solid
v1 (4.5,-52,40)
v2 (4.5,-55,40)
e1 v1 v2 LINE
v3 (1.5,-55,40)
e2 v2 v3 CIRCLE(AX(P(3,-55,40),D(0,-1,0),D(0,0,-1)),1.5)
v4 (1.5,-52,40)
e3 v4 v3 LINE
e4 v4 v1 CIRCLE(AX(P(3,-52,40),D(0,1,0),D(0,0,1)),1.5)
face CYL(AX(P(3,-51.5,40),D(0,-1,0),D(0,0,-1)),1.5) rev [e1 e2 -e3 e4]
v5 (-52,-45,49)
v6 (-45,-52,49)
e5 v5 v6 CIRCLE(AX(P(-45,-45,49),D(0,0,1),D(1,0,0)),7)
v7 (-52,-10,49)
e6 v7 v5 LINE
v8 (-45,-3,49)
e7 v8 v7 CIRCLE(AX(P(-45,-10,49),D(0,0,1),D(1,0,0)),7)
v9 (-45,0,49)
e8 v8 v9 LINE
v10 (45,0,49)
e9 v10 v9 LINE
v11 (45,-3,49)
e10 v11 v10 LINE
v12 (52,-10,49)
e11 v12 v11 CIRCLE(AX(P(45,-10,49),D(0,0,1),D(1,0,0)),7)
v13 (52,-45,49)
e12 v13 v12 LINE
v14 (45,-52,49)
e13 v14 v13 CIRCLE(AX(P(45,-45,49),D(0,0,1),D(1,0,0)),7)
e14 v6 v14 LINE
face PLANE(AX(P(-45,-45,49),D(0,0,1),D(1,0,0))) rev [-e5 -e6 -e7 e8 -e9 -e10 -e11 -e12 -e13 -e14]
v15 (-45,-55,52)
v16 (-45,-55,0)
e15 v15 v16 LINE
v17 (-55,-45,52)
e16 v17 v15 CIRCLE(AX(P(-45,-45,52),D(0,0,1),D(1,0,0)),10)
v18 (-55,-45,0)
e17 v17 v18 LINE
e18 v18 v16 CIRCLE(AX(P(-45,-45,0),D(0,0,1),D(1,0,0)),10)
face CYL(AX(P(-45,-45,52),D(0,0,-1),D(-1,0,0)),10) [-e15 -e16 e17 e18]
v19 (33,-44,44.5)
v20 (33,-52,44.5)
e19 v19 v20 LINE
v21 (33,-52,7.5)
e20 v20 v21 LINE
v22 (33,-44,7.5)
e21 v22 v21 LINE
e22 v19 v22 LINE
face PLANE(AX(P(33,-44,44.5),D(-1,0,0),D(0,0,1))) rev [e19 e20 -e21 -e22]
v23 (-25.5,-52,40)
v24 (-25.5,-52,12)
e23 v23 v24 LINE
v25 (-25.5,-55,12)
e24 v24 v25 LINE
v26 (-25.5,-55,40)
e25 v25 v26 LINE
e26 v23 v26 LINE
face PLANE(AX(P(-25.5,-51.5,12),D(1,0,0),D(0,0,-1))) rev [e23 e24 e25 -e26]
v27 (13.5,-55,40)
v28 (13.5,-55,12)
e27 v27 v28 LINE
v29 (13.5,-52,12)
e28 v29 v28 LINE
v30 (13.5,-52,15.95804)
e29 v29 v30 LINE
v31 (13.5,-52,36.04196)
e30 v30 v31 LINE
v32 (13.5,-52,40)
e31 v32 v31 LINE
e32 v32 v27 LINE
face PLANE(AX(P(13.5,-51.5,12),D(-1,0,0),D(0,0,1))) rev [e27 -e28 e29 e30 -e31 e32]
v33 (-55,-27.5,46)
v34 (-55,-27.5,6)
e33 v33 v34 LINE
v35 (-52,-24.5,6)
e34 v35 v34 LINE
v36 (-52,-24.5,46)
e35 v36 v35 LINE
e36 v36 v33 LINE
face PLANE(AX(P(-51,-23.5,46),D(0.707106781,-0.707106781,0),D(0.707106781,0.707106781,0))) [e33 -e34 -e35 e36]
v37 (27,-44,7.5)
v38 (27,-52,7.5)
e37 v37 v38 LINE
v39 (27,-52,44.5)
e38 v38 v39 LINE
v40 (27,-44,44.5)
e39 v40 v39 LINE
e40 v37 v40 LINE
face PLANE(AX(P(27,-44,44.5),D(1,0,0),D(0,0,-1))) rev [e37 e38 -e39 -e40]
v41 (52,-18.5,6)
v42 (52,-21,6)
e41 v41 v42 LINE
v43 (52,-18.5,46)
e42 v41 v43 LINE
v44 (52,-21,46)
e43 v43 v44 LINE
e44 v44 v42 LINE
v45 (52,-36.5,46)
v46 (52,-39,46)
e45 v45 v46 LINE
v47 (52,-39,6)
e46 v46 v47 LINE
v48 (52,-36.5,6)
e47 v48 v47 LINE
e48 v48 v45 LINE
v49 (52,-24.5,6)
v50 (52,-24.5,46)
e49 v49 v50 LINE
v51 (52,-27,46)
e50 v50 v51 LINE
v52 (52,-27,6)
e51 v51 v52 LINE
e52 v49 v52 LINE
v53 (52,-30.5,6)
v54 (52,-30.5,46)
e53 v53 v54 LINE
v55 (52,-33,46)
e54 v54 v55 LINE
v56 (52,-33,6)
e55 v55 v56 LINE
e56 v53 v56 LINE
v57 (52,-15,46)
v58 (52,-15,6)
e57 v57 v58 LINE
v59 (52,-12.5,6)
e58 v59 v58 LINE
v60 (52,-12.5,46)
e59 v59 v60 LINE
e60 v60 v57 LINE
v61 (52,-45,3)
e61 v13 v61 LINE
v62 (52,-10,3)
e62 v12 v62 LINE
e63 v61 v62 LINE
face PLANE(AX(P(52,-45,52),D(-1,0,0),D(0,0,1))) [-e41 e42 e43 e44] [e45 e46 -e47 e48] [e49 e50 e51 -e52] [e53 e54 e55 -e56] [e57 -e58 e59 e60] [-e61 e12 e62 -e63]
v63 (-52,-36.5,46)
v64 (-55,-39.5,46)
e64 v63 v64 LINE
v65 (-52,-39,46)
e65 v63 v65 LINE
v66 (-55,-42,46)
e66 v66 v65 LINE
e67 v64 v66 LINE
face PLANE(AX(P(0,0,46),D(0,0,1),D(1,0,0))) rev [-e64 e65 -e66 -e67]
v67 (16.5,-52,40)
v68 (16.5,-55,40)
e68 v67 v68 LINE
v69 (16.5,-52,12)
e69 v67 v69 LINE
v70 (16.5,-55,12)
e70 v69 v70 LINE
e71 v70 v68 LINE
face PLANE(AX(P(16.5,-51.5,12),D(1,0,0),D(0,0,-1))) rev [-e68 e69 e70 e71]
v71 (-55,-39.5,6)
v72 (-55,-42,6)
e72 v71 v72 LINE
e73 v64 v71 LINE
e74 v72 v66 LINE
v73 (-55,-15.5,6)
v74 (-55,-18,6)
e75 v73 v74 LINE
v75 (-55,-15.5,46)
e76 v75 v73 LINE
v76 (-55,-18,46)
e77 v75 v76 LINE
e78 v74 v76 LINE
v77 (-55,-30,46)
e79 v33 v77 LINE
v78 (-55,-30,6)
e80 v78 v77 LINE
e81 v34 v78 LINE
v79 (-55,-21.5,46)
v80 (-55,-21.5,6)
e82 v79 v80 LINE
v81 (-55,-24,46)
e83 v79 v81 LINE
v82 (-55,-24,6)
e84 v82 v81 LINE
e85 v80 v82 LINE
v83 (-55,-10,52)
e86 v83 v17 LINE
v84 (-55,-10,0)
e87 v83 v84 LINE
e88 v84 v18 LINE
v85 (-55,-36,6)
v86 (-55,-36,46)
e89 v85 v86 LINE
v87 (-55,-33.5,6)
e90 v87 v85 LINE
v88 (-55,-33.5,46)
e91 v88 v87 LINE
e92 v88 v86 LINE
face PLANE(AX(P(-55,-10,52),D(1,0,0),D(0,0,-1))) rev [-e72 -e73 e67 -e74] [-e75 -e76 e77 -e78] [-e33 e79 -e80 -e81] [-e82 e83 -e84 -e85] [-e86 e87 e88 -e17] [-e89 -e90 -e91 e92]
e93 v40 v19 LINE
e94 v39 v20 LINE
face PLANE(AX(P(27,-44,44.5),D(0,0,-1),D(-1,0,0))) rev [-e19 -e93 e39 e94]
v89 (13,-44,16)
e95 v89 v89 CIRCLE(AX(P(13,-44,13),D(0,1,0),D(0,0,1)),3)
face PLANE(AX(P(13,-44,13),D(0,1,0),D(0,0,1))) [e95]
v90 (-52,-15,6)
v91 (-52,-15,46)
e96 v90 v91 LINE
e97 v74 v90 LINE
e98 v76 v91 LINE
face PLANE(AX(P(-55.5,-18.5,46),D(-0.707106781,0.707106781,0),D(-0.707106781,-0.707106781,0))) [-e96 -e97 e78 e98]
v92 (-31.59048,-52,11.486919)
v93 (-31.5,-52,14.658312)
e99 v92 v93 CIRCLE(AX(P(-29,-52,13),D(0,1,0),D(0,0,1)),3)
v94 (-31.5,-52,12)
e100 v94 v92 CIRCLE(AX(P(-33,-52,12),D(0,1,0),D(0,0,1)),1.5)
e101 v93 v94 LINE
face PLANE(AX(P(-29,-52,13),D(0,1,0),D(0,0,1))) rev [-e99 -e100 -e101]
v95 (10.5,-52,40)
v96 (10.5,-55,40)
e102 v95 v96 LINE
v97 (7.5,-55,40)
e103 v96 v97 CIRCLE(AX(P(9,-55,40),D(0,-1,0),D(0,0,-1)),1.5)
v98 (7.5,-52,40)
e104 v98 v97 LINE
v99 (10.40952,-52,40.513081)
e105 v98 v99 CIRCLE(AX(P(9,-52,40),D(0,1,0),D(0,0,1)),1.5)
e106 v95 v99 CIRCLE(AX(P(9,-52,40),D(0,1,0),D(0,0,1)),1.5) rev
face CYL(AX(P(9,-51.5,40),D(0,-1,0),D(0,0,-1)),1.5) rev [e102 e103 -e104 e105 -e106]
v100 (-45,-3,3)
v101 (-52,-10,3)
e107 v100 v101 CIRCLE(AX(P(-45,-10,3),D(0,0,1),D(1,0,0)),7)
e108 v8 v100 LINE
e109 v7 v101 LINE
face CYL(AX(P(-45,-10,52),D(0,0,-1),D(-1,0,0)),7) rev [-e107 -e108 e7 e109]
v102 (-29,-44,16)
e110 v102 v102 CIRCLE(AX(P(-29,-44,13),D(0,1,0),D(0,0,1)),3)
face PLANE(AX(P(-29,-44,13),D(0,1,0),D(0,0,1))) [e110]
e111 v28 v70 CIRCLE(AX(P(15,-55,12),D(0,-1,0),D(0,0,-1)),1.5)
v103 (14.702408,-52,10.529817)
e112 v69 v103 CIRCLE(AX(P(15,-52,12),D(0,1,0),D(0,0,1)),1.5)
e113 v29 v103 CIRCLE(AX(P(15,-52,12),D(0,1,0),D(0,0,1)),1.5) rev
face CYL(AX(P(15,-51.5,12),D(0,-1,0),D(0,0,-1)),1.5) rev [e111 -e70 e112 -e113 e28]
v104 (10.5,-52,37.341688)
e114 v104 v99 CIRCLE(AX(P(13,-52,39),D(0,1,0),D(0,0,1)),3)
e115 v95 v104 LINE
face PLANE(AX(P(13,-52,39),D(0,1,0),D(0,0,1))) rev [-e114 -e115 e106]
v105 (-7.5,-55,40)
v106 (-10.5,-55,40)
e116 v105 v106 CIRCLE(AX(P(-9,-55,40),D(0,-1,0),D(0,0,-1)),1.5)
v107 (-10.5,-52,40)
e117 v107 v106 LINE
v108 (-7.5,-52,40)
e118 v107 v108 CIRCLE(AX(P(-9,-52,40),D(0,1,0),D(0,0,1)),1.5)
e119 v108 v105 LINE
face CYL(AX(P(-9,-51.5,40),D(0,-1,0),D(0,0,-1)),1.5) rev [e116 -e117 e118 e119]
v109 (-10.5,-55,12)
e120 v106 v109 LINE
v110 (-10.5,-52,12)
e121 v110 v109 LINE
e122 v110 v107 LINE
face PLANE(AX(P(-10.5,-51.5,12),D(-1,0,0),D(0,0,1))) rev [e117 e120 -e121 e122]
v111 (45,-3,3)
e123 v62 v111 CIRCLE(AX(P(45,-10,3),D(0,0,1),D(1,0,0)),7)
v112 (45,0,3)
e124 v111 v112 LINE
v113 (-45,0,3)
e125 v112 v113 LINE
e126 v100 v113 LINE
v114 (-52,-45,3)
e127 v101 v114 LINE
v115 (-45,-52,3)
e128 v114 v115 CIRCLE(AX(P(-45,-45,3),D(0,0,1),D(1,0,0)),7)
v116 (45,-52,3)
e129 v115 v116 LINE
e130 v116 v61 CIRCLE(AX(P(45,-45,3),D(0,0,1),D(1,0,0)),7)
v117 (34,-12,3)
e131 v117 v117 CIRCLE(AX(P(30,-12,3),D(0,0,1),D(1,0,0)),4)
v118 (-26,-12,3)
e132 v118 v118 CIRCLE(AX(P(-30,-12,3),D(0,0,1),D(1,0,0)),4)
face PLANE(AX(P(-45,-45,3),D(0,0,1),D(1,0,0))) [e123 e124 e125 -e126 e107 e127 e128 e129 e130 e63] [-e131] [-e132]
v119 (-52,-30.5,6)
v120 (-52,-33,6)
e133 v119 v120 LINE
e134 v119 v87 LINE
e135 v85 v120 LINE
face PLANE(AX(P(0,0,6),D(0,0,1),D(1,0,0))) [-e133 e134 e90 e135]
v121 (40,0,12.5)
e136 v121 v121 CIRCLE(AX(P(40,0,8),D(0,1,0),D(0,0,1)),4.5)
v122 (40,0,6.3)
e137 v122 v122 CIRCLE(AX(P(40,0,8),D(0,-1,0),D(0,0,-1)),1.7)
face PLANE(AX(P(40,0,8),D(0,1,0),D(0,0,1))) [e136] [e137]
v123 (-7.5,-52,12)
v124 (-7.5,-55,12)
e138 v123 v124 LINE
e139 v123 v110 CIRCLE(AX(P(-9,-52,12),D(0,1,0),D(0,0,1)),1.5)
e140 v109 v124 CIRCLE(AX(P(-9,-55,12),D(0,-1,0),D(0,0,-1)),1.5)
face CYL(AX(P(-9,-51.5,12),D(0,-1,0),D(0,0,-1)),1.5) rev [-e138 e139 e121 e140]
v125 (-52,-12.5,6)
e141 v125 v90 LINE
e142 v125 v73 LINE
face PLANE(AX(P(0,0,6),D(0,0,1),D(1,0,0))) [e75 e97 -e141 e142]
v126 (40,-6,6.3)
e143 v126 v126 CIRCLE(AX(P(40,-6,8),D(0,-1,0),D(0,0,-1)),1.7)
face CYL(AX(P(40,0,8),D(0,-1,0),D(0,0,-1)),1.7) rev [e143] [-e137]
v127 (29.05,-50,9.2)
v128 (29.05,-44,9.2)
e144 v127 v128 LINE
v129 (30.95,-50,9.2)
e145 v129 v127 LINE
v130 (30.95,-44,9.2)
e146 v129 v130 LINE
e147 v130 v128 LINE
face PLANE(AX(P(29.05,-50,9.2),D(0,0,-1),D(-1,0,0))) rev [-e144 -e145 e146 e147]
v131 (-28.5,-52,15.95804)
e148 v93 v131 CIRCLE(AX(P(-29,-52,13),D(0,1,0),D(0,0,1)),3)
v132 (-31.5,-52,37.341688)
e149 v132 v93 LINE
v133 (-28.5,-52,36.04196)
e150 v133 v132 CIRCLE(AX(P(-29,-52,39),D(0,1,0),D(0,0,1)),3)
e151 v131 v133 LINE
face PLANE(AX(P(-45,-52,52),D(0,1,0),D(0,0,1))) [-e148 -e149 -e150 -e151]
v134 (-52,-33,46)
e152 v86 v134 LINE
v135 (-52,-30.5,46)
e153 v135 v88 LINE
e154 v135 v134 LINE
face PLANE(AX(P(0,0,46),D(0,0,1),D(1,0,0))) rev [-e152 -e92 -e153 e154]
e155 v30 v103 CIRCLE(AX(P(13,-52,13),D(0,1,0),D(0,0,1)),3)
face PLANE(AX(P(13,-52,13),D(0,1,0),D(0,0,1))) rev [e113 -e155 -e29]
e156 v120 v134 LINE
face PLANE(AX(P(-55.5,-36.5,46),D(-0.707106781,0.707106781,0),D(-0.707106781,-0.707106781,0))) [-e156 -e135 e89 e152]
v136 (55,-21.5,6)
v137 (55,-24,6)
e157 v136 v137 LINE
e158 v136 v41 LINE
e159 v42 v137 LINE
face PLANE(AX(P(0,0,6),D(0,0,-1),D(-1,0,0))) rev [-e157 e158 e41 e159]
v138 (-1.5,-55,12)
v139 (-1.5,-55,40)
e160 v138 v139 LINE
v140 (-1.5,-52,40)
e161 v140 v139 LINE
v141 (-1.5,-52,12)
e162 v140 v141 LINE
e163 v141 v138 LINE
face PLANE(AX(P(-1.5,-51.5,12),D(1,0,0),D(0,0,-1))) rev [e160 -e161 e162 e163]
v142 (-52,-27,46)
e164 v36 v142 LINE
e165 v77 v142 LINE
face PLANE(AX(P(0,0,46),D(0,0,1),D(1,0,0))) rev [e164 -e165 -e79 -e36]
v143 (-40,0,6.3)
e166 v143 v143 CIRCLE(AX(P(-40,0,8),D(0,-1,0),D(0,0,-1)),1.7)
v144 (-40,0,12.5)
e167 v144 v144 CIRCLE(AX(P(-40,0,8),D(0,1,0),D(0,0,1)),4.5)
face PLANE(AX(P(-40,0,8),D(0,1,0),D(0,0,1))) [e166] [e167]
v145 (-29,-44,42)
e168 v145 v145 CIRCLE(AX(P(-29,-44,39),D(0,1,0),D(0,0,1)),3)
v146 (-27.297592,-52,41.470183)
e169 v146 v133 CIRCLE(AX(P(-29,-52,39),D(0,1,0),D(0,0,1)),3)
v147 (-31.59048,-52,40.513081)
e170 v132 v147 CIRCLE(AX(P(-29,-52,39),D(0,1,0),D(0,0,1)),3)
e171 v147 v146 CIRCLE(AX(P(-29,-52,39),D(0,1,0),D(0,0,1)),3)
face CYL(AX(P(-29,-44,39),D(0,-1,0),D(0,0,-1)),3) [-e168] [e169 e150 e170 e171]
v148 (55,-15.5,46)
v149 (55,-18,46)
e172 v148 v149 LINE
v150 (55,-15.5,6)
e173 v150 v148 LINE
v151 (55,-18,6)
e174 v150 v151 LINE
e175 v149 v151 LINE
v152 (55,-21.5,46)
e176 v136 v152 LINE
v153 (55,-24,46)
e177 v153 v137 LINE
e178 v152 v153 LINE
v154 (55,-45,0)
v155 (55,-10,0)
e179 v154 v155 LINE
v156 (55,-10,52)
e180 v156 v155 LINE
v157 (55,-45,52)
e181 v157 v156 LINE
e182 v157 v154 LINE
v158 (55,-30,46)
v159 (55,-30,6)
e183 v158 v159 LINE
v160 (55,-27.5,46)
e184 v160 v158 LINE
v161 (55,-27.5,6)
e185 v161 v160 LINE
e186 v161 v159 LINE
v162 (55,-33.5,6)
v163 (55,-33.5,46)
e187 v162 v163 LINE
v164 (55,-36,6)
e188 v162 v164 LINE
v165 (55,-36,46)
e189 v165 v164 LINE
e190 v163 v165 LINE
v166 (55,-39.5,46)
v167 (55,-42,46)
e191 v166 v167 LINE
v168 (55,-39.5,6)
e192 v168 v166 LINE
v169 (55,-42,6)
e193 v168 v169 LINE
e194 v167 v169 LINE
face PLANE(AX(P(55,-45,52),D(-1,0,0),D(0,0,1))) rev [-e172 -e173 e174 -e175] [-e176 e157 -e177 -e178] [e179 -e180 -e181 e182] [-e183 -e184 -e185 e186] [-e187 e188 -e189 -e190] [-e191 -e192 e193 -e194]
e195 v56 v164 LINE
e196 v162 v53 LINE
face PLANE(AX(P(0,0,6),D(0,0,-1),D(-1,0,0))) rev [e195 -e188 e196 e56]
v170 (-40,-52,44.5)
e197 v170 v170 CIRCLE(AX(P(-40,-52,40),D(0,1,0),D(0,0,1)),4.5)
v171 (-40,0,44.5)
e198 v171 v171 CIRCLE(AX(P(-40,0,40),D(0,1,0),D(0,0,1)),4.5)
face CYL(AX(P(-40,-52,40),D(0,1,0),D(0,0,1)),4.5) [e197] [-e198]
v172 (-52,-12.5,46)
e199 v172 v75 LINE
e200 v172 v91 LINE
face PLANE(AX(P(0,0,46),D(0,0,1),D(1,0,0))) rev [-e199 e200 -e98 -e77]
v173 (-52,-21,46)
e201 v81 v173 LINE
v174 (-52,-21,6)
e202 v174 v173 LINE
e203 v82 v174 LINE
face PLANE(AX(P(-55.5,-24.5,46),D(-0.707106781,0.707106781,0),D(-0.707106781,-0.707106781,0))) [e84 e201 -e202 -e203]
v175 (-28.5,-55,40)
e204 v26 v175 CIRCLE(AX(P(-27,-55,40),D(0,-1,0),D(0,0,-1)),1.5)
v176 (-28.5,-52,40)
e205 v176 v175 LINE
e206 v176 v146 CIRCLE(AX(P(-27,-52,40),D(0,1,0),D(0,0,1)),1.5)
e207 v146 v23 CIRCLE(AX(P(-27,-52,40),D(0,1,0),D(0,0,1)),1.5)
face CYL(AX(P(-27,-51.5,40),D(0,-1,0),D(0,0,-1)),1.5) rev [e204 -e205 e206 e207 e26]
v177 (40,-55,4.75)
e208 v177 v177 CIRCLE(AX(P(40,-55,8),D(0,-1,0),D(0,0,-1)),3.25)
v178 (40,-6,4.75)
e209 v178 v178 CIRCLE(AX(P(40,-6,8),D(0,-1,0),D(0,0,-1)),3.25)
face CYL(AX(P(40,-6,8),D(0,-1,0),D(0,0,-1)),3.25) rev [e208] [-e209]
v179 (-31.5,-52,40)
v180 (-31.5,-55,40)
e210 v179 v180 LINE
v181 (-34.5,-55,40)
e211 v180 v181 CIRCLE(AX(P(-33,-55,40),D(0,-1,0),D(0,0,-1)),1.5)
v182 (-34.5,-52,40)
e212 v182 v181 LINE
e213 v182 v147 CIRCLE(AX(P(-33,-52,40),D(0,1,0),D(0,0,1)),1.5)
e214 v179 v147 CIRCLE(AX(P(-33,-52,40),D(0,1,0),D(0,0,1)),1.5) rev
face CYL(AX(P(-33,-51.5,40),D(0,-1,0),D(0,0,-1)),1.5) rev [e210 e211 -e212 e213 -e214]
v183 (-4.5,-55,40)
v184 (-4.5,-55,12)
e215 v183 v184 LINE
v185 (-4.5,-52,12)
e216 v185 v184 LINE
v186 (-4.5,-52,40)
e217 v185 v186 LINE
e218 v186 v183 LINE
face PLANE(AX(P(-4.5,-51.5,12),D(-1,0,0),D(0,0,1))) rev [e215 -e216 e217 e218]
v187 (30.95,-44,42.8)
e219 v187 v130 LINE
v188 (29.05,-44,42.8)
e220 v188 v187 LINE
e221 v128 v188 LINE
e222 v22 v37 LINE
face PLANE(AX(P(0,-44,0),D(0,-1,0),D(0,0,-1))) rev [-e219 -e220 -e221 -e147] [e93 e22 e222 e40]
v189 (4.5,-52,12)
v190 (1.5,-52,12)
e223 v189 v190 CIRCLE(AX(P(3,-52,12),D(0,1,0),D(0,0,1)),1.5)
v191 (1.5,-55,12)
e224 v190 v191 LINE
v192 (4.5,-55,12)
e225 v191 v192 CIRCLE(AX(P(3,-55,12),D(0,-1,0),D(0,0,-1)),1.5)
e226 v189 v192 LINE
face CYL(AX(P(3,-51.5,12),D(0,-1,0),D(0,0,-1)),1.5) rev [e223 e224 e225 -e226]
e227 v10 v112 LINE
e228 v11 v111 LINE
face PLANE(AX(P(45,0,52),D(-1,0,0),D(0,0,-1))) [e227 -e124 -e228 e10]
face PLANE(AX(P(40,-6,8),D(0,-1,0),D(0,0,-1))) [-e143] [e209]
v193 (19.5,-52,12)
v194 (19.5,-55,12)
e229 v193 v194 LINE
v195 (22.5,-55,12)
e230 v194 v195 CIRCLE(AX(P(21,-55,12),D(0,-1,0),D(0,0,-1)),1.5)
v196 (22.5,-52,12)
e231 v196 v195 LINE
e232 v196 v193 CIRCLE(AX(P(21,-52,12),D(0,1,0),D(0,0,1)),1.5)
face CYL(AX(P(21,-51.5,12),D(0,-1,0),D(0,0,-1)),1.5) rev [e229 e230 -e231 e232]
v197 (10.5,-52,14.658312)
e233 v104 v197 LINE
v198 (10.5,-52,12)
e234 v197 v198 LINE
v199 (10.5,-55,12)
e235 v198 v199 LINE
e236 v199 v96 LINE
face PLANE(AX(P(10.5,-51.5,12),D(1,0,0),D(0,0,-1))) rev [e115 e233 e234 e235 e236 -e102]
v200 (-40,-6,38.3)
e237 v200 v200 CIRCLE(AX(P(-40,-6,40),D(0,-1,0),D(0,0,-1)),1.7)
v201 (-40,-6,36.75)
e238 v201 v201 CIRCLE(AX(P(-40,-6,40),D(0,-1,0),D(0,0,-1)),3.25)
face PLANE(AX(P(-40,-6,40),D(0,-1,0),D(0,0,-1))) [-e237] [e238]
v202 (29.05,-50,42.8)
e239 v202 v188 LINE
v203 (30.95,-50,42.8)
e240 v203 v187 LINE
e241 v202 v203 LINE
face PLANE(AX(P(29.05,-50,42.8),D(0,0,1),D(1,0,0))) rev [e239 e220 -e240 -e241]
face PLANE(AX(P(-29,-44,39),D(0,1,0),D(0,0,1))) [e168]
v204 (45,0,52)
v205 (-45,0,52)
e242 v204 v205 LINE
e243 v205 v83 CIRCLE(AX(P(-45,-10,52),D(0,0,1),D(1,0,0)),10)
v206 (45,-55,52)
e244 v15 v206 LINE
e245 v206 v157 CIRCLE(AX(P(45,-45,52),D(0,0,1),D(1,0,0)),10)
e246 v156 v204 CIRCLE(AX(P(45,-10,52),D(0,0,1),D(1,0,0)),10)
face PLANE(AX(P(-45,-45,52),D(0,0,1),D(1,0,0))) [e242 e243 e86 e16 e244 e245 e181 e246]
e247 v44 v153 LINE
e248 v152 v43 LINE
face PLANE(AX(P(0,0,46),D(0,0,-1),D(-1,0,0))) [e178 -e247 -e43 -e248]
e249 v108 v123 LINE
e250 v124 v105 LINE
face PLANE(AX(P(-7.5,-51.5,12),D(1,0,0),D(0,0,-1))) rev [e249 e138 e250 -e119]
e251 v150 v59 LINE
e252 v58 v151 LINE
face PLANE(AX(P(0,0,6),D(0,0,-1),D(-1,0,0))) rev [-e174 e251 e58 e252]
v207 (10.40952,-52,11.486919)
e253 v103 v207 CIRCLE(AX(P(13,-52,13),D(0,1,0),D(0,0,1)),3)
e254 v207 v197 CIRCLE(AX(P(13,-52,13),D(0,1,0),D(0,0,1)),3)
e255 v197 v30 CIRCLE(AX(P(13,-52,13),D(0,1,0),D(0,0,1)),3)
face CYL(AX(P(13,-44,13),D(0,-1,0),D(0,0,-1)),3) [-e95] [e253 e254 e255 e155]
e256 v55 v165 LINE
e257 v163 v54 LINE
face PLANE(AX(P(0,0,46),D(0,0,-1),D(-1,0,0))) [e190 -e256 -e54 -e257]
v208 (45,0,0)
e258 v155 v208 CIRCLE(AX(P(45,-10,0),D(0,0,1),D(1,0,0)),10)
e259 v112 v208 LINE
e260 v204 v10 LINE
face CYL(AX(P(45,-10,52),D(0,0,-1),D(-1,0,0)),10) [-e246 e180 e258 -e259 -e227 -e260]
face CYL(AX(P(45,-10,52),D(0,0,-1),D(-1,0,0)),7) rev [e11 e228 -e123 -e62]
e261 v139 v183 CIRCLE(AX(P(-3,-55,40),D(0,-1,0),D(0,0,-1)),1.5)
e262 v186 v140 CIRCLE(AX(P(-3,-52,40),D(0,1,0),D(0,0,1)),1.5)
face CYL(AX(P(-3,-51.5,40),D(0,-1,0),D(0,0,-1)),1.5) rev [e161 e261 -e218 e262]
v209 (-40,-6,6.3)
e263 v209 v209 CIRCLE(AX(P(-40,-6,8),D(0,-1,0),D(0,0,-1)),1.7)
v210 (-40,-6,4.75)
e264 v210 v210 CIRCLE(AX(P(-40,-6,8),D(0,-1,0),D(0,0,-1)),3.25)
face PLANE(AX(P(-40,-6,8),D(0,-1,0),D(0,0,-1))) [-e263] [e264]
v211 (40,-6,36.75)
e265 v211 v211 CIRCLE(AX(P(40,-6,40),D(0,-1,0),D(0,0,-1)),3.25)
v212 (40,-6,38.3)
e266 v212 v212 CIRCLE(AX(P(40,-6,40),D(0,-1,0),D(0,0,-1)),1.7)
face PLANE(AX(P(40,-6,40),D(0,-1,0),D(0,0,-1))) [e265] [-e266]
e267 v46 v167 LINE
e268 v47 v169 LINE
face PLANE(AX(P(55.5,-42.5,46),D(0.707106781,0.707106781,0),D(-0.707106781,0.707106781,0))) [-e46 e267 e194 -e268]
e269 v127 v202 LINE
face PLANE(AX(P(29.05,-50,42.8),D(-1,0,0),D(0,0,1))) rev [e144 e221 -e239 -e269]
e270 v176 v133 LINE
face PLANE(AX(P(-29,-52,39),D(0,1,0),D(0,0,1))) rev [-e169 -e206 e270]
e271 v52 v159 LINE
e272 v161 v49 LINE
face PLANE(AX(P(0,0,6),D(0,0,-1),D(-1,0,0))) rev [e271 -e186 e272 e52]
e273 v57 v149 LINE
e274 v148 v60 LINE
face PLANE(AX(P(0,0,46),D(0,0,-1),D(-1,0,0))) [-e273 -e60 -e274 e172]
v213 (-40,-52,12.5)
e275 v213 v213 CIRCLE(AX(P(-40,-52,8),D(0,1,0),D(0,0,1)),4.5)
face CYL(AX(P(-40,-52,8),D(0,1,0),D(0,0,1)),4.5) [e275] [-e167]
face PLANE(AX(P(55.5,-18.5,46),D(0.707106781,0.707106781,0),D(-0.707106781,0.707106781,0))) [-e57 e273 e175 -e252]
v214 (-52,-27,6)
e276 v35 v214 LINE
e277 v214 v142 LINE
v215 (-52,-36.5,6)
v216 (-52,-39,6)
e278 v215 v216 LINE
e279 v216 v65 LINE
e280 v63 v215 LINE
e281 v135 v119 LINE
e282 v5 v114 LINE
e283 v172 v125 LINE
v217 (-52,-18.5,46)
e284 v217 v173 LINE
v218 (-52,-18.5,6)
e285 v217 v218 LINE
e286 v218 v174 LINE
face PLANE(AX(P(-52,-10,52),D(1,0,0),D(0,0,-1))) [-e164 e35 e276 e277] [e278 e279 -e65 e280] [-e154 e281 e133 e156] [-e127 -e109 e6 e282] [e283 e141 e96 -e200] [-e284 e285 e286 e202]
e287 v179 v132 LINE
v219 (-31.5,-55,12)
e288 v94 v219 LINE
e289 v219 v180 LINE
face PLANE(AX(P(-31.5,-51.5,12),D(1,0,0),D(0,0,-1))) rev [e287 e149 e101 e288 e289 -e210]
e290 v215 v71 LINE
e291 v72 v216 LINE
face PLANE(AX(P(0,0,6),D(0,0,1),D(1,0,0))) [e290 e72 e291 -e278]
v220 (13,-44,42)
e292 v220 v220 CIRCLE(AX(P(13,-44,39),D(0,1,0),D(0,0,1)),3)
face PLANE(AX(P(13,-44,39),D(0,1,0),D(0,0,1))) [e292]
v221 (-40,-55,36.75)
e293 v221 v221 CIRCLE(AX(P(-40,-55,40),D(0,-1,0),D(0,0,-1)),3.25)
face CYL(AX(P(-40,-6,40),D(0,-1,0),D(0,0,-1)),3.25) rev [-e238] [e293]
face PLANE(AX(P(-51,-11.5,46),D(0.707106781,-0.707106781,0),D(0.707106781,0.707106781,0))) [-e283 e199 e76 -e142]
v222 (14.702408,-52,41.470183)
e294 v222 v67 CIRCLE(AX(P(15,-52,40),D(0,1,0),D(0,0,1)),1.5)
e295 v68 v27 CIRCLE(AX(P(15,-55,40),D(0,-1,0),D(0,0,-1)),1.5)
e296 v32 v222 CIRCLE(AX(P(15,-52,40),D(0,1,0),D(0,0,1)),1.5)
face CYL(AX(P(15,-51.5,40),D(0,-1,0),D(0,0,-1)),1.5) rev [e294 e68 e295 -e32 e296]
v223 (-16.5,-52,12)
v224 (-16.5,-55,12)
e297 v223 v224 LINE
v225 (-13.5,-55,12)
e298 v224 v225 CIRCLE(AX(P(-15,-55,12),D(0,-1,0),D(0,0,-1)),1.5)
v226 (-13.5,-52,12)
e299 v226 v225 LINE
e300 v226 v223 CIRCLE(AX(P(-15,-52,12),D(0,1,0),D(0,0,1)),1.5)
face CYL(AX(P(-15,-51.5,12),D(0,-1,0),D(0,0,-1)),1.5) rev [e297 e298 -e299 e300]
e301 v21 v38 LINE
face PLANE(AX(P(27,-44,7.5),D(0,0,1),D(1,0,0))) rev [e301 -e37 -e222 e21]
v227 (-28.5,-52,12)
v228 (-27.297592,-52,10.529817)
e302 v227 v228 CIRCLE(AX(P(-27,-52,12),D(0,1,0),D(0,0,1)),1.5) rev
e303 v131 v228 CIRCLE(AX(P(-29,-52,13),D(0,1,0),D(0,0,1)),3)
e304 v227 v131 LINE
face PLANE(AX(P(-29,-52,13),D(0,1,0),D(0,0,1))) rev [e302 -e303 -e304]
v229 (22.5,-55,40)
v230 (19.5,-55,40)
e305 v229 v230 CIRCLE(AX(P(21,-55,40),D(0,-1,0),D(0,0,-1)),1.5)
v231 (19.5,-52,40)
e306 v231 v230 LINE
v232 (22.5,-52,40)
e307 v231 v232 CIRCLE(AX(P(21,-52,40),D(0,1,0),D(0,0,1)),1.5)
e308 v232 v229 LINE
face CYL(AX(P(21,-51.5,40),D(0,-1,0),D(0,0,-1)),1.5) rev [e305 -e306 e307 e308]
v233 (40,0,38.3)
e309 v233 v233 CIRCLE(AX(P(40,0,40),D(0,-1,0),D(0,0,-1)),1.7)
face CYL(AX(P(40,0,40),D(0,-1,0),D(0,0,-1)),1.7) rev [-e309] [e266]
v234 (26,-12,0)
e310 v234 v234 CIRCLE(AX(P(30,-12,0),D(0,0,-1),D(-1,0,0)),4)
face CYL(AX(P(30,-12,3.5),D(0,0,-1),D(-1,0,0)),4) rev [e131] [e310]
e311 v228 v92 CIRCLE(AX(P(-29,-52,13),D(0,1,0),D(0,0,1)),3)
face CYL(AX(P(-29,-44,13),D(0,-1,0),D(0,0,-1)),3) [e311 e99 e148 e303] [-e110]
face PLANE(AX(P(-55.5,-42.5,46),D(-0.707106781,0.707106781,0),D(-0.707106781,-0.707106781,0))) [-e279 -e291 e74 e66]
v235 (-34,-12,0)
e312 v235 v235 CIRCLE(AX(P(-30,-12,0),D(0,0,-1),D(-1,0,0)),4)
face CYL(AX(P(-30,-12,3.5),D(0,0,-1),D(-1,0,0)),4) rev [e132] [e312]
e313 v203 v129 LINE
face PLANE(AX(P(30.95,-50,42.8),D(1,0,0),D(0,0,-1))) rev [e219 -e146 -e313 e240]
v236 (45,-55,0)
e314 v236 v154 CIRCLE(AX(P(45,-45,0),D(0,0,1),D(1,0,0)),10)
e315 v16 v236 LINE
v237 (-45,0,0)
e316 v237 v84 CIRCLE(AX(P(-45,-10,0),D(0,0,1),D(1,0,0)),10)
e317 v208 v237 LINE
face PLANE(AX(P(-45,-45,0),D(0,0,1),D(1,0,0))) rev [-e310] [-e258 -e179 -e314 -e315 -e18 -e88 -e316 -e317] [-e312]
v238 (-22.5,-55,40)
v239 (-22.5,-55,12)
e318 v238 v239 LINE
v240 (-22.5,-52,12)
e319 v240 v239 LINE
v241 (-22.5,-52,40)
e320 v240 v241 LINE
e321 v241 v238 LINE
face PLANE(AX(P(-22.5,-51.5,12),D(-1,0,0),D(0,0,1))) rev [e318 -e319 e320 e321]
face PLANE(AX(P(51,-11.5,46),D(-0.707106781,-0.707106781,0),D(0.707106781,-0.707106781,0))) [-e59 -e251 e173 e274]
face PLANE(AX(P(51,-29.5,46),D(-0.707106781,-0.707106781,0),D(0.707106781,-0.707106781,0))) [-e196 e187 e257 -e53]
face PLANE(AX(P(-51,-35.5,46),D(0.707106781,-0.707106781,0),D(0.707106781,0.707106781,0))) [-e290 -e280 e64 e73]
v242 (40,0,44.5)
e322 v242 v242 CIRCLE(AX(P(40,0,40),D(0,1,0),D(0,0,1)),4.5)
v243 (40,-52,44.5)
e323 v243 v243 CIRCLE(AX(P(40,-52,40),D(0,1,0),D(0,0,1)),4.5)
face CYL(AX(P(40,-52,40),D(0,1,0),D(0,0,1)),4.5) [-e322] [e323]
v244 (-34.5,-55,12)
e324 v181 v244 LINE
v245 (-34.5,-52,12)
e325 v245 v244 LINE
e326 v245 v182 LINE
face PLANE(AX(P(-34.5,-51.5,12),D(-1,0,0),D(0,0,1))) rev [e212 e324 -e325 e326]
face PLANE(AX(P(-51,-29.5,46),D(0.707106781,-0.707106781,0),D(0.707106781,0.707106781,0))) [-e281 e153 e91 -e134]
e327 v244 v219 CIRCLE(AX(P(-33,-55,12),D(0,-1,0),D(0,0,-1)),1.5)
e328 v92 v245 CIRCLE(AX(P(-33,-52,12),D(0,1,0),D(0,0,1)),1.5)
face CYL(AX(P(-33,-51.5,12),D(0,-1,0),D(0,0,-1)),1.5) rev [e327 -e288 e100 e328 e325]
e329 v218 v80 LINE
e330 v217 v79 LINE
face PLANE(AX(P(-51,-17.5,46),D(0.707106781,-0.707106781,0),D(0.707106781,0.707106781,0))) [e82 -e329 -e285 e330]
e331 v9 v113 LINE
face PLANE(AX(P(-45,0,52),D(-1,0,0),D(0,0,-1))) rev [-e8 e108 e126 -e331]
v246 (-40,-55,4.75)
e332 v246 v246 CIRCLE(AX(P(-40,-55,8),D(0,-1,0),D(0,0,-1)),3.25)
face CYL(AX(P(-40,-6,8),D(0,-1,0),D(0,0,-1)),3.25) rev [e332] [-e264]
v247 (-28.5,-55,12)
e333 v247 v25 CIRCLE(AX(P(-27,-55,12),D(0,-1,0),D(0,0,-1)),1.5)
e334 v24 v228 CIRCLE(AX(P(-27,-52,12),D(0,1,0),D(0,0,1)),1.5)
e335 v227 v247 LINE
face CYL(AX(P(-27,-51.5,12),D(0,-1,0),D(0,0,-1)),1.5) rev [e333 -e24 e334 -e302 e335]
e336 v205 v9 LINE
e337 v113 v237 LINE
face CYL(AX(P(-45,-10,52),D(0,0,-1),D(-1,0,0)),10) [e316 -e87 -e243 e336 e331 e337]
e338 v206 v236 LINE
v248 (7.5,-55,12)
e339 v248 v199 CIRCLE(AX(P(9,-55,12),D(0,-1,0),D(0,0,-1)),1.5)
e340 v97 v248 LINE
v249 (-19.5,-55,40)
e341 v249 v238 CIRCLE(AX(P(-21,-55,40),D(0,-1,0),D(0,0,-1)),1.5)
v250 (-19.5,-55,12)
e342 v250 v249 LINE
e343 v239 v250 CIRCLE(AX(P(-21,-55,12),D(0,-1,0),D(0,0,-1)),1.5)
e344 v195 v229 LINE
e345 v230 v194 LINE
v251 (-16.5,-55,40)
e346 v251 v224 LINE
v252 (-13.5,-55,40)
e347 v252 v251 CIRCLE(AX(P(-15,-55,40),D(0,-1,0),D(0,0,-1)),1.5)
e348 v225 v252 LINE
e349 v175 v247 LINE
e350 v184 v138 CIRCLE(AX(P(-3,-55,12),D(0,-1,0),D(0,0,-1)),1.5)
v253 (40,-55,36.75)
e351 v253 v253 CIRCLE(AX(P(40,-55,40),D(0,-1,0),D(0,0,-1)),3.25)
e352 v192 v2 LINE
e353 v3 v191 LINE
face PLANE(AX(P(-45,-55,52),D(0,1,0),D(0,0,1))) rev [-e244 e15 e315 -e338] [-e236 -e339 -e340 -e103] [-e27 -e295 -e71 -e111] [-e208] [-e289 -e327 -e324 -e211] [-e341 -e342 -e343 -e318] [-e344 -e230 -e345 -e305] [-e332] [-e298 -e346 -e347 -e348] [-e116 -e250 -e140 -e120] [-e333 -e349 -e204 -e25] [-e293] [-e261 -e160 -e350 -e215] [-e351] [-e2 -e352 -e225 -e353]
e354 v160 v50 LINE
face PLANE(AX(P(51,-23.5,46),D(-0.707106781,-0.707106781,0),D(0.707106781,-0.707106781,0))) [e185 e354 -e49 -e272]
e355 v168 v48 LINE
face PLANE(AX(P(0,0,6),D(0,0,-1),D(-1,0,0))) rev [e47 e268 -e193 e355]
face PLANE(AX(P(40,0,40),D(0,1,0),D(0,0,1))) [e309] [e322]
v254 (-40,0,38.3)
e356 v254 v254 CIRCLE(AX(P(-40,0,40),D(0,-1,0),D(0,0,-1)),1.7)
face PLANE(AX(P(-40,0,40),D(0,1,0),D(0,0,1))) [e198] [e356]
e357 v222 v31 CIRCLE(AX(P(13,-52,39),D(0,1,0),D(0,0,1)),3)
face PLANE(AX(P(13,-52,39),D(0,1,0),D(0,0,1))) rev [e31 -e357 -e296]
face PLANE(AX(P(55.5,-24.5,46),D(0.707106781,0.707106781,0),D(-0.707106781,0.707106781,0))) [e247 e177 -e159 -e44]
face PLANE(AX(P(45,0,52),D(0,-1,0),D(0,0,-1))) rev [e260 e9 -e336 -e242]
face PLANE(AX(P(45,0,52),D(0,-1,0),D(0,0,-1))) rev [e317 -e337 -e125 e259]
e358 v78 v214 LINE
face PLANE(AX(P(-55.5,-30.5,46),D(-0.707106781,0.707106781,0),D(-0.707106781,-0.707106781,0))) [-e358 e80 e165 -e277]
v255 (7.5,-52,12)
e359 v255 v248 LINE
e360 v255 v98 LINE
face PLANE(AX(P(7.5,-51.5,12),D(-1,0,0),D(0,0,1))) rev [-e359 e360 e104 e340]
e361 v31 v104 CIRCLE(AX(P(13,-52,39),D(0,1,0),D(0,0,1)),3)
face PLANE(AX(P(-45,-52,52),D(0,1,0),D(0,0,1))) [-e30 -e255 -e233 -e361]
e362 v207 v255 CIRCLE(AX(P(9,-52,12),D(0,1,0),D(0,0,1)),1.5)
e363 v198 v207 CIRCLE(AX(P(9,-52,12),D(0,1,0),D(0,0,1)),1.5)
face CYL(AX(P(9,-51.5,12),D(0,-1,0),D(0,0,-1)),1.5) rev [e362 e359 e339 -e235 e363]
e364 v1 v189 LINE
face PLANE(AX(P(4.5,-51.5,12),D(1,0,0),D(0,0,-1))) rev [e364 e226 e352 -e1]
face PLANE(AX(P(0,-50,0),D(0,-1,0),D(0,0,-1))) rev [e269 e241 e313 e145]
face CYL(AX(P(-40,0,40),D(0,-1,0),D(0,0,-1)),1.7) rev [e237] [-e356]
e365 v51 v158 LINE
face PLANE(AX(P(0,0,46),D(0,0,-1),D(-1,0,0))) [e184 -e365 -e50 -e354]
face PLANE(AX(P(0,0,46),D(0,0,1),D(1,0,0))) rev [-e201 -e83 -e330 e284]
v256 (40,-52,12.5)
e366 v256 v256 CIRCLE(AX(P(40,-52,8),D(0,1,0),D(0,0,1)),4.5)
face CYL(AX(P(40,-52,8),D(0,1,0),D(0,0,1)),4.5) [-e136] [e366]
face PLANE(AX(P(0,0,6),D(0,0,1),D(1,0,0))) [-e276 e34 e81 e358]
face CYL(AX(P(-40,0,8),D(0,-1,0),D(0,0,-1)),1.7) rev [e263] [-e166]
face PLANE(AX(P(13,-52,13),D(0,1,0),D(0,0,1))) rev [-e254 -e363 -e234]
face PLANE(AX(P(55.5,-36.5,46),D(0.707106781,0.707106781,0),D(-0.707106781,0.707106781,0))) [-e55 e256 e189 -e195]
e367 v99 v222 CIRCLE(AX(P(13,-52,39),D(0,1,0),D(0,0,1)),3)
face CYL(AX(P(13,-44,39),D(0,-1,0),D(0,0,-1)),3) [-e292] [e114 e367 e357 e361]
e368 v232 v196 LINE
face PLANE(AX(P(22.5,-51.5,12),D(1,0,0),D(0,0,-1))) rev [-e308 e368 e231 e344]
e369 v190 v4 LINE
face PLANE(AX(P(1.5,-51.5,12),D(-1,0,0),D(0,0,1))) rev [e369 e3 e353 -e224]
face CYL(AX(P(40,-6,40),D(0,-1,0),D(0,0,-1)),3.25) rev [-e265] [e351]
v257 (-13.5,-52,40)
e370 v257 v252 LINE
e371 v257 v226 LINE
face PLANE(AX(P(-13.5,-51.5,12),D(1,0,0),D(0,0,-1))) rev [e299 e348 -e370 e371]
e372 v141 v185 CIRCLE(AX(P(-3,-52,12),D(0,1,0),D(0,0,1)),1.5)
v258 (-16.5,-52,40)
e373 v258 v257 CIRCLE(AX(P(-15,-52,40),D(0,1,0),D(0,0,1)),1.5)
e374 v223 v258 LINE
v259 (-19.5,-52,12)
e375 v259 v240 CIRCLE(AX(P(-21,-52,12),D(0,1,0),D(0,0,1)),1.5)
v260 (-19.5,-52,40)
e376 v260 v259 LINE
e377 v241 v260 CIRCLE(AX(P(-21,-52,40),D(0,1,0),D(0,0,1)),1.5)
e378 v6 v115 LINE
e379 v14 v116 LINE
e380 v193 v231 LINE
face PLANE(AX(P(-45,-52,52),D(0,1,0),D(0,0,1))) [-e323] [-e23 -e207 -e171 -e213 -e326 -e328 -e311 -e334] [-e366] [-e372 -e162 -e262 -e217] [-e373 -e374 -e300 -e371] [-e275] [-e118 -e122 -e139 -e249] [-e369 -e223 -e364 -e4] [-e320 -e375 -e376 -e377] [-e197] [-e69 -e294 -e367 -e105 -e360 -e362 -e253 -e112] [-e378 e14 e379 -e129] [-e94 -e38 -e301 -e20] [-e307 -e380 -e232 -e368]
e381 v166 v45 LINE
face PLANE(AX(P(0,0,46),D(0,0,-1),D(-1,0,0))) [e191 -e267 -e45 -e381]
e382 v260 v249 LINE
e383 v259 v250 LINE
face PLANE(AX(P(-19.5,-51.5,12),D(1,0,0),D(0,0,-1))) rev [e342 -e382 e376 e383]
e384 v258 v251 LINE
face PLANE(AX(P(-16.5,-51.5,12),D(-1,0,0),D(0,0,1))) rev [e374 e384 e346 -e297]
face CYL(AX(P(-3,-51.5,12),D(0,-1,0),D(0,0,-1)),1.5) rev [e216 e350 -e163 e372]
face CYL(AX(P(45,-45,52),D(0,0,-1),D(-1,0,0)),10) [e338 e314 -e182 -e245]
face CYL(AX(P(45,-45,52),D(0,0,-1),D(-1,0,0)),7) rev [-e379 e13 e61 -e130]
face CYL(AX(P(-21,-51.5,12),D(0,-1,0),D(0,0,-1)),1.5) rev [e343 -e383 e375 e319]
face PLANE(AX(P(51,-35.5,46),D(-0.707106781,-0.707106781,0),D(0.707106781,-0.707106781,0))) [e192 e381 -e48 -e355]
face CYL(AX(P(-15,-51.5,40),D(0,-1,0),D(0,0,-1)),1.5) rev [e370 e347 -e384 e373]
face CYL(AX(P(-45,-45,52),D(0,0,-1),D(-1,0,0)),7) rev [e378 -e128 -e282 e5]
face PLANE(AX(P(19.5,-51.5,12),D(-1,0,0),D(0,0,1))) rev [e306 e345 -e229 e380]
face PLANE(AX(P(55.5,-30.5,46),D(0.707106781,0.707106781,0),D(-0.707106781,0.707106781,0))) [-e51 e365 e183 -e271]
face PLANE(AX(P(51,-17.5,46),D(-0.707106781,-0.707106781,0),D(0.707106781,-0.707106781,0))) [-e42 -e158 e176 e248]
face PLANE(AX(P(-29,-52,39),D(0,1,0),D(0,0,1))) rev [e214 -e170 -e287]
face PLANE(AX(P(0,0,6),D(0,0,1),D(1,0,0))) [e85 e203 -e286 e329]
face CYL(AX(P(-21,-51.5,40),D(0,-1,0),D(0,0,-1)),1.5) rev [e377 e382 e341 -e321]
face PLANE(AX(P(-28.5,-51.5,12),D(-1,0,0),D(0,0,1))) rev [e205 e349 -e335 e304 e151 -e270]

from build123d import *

# Parameters (mm, degrees)
BOSS_EXTRUDE1_DEPTH     = 52
SHELL1_START            = 3
SHELL1_DEPTH            = 46
SKETCH2_R               = 4.5
BOSS_EXTRUDE2_DEPTH     = 52
SKETCH3_R               = 3.25
CUT_EXTRUDE1_DEPTH      = 49
SKETCH4_R               = 1.7
CUT_EXTRUDE2_DEPTH      = 91.166512631
CUT_EXTRUDE3_DEPTH      = 20
CUT_EXTRUDE3_DEPTH_BACK = 20
CUT_EXTRUDE4_DEPTH      = 3.5
SKETCH7_R               = 4
CUT_EXTRUDE5_DEPTH      = 3.5
SKETCH8_W               = 6
SKETCH8_H               = 37
BOSS_EXTRUDE3_DEPTH     = 8
SKETCH9_W               = 1.9
SKETCH9_H               = 33.6
CUT_EXTRUDE6_DEPTH      = 6
SKETCH10_R              = 3
BOSS_EXTRUDE4_DEPTH     = 8


# Read off the part's stored shape, not the designer's step: Shell1
with BuildPart() as part:
    # Sketch1 → Boss-Extrude1 (new body)
    with BuildSketch(Plane.XY):
        with BuildLine():
            Line((-45, -55), (45, -55))
            ThreePointArc((45, -55), (52.071067812, -52.071067812), (55, -45))
            Line((55, -45), (55, -10))
            ThreePointArc((55, -10), (52.071067812, -2.928932188), (45, 0))
            Line((45, 0), (-45, 0))
            ThreePointArc((-45, 0), (-52.071067812, -2.928932188), (-55, -10))
            Line((-55, -10), (-55, -45))
            ThreePointArc((-55, -45), (-52.071067812, -52.071067812), (-45, -55))
        make_face()
    extrude(amount=BOSS_EXTRUDE1_DEPTH)

    # Shell1 outline → Shell1 (cut)
    with BuildSketch(Plane.XY.offset(SHELL1_START)):
        with BuildLine():
            Line((45, -3), (45, 0))
            Line((45, 0), (-45, 0))
            Line((-45, 0), (-45, -3))
            ThreePointArc((-45, -3), (-49.949747468, -5.050252532), (-52, -10))
            Line((-52, -10), (-52, -45))
            ThreePointArc((-52, -45), (-49.949747468, -49.949747468), (-45, -52))
            Line((-45, -52), (45, -52))
            ThreePointArc((45, -52), (49.949747468, -49.949747468), (52, -45))
            Line((52, -45), (52, -10))
            ThreePointArc((52, -10), (49.949747468, -5.050252532), (45, -3))
        make_face()
    extrude(amount=SHELL1_DEPTH, mode=Mode.SUBTRACT)

    # Sketch2 → Boss-Extrude2 (add)
    with BuildSketch(Plane(origin=(0, 0, 0), x_dir=(1, 0, 0), z_dir=(0, 1, 0))):
        with Locations(Location((-40, -8, 0), (0, 0, 270))):
            Circle(SKETCH2_R)
        with Locations(Location((40, -8, 0), (0, 0, 270))):
            Circle(SKETCH2_R)
        with Locations(Location((-40, -40, 0), (0, 0, 270))):
            Circle(SKETCH2_R)
        with Locations(Location((40, -40, 0), (0, 0, 270))):
            Circle(SKETCH2_R)
    extrude(amount=-BOSS_EXTRUDE2_DEPTH)

    # Sketch3 → Cut-Extrude1 (cut)
    with BuildSketch(Plane.XZ.offset(55)):
        with Locations(Location((-40, 8, 0), (0, 0, 270))):
            Circle(SKETCH3_R)
        with Locations(Location((40, 8, 0), (0, 0, 270))):
            Circle(SKETCH3_R)
        with Locations(Location((-40, 40, 0), (0, 0, 270))):
            Circle(SKETCH3_R)
        with Locations(Location((40, 40, 0), (0, 0, 270))):
            Circle(SKETCH3_R)
    extrude(amount=-CUT_EXTRUDE1_DEPTH, mode=Mode.SUBTRACT)

    # Sketch4 → Cut-Extrude2 (cut, through all)
    with BuildSketch(Plane.XZ.offset(6)):
        with Locations(Location((-40, 8, 0), (0, 0, 270))):
            Circle(SKETCH4_R)
        with Locations(Location((40, 8, 0), (0, 0, 270))):
            Circle(SKETCH4_R)
        with Locations(Location((-40, 40, 0), (0, 0, 270))):
            Circle(SKETCH4_R)
        with Locations(Location((40, 40, 0), (0, 0, 270))):
            Circle(SKETCH4_R)
    extrude(amount=-CUT_EXTRUDE2_DEPTH, mode=Mode.SUBTRACT)

    # Sketch5 → Cut-Extrude3 (cut, two sides: drawn at the far end of the back side and taken through both)
    with BuildSketch(Plane.XY.offset(26).offset(-CUT_EXTRUDE3_DEPTH_BACK)):
        Polygon((-51, -14), (-51, -11.5), (-55.5, -16), (-55.5, -18.5), align=None)
        Polygon((51, -14), (51, -11.5), (55.5, -16), (55.5, -18.5), align=None)
        Polygon((-51, -20), (-51, -17.5), (-55.5, -22), (-55.5, -24.5), align=None)
        Polygon((51, -20), (51, -17.5), (55.5, -22), (55.5, -24.5), align=None)
        Polygon((-51, -26), (-51, -23.5), (-55.5, -28), (-55.5, -30.5), align=None)
        Polygon((51, -26), (51, -23.5), (55.5, -28), (55.5, -30.5), align=None)
        Polygon((-51, -32), (-51, -29.5), (-55.5, -34), (-55.5, -36.5), align=None)
        Polygon((51, -32), (51, -29.5), (55.5, -34), (55.5, -36.5), align=None)
        Polygon((-51, -38), (-51, -35.5), (-55.5, -40), (-55.5, -42.5), align=None)
        Polygon((51, -38), (51, -35.5), (55.5, -40), (55.5, -42.5), align=None)
    extrude(amount=CUT_EXTRUDE3_DEPTH + CUT_EXTRUDE3_DEPTH_BACK, mode=Mode.SUBTRACT)

    # Sketch6 → Cut-Extrude4 (cut)
    with BuildSketch(Plane.XZ.offset(55)):
        with BuildLine():
            Line((-34.5, 12), (-34.5, 40))
            ThreePointArc((-34.5, 40), (-33, 41.5), (-31.5, 40))
            Line((-31.5, 40), (-31.5, 12))
            ThreePointArc((-31.5, 12), (-33, 10.5), (-34.5, 12))
        make_face()
        with BuildLine():
            Line((-28.5, 12), (-28.5, 40))
            ThreePointArc((-28.5, 40), (-27, 41.5), (-25.5, 40))
            Line((-25.5, 40), (-25.5, 12))
            ThreePointArc((-25.5, 12), (-27, 10.5), (-28.5, 12))
        make_face()
        with BuildLine():
            Line((-22.5, 12), (-22.5, 40))
            ThreePointArc((-22.5, 40), (-21, 41.5), (-19.5, 40))
            Line((-19.5, 40), (-19.5, 12))
            ThreePointArc((-19.5, 12), (-21, 10.5), (-22.5, 12))
        make_face()
        with BuildLine():
            Line((-16.5, 12), (-16.5, 40))
            ThreePointArc((-16.5, 40), (-15, 41.5), (-13.5, 40))
            Line((-13.5, 40), (-13.5, 12))
            ThreePointArc((-13.5, 12), (-15, 10.5), (-16.5, 12))
        make_face()
        with BuildLine():
            Line((-10.5, 12), (-10.5, 40))
            ThreePointArc((-10.5, 40), (-9, 41.5), (-7.5, 40))
            Line((-7.5, 40), (-7.5, 12))
            ThreePointArc((-7.5, 12), (-9, 10.5), (-10.5, 12))
        make_face()
        with BuildLine():
            Line((-4.5, 12), (-4.5, 40))
            ThreePointArc((-4.5, 40), (-3, 41.5), (-1.5, 40))
            Line((-1.5, 40), (-1.5, 12))
            ThreePointArc((-1.5, 12), (-3, 10.5), (-4.5, 12))
        make_face()
        with BuildLine():
            Line((1.5, 12), (1.5, 40))
            ThreePointArc((1.5, 40), (3, 41.5), (4.5, 40))
            Line((4.5, 40), (4.5, 12))
            ThreePointArc((4.5, 12), (3, 10.5), (1.5, 12))
        make_face()
        with BuildLine():
            Line((7.5, 12), (7.5, 40))
            ThreePointArc((7.5, 40), (9, 41.5), (10.5, 40))
            Line((10.5, 40), (10.5, 12))
            ThreePointArc((10.5, 12), (9, 10.5), (7.5, 12))
        make_face()
        with BuildLine():
            Line((13.5, 12), (13.5, 40))
            ThreePointArc((13.5, 40), (15, 41.5), (16.5, 40))
            Line((16.5, 40), (16.5, 12))
            ThreePointArc((16.5, 12), (15, 10.5), (13.5, 12))
        make_face()
        with BuildLine():
            Line((19.5, 12), (19.5, 40))
            ThreePointArc((19.5, 40), (21, 41.5), (22.5, 40))
            Line((22.5, 40), (22.5, 12))
            ThreePointArc((22.5, 12), (21, 10.5), (19.5, 12))
        make_face()
    extrude(amount=-CUT_EXTRUDE4_DEPTH, mode=Mode.SUBTRACT)

    # Sketch7 → Cut-Extrude5 (cut)
    with BuildSketch(Plane(origin=(0, 0, 0), x_dir=(-1, 0, 0), z_dir=(0, 0, -1))):
        with Locations((30, -12)):
            Circle(SKETCH7_R)
        with Locations((-30, -12)):
            Circle(SKETCH7_R)
    extrude(amount=-CUT_EXTRUDE5_DEPTH, mode=Mode.SUBTRACT)

    # Sketch8 → Boss-Extrude3 (add)
    with BuildSketch(Plane(origin=(0, -52, 0), x_dir=(1, 0, 0), z_dir=(0, 1, 0))):
        with Locations((30, -26)):
            Rectangle(SKETCH8_W, SKETCH8_H)
    extrude(amount=BOSS_EXTRUDE3_DEPTH)

    # Sketch9 → Cut-Extrude6 (cut)
    with BuildSketch(Plane(origin=(0, -44, 0), x_dir=(1, 0, 0), z_dir=(0, 1, 0))):
        with Locations((30, -26)):
            Rectangle(SKETCH9_W, SKETCH9_H)
    extrude(amount=-CUT_EXTRUDE6_DEPTH, mode=Mode.SUBTRACT)

    # Sketch10 → Boss-Extrude4 (add)
    with BuildSketch(Plane(origin=(0, -52, 0), x_dir=(1, 0, 0), z_dir=(0, 1, 0))):
        with Locations(Location((-29, -13, 0), (0, 0, 55.426050329))):
            Circle(SKETCH10_R)
        with Locations(Location((-29, -39, 0), (0, 0, 80.405931773))):
            Circle(SKETCH10_R)
        with Locations(Location((13, -13, 0), (0, 0, 55.426050329))):
            Circle(SKETCH10_R)
        with Locations(Location((13, -39, 0), (0, 0, 80.405931773))):
            Circle(SKETCH10_R)
    extrude(amount=BOSS_EXTRUDE4_DEPTH)


solid = part.part
